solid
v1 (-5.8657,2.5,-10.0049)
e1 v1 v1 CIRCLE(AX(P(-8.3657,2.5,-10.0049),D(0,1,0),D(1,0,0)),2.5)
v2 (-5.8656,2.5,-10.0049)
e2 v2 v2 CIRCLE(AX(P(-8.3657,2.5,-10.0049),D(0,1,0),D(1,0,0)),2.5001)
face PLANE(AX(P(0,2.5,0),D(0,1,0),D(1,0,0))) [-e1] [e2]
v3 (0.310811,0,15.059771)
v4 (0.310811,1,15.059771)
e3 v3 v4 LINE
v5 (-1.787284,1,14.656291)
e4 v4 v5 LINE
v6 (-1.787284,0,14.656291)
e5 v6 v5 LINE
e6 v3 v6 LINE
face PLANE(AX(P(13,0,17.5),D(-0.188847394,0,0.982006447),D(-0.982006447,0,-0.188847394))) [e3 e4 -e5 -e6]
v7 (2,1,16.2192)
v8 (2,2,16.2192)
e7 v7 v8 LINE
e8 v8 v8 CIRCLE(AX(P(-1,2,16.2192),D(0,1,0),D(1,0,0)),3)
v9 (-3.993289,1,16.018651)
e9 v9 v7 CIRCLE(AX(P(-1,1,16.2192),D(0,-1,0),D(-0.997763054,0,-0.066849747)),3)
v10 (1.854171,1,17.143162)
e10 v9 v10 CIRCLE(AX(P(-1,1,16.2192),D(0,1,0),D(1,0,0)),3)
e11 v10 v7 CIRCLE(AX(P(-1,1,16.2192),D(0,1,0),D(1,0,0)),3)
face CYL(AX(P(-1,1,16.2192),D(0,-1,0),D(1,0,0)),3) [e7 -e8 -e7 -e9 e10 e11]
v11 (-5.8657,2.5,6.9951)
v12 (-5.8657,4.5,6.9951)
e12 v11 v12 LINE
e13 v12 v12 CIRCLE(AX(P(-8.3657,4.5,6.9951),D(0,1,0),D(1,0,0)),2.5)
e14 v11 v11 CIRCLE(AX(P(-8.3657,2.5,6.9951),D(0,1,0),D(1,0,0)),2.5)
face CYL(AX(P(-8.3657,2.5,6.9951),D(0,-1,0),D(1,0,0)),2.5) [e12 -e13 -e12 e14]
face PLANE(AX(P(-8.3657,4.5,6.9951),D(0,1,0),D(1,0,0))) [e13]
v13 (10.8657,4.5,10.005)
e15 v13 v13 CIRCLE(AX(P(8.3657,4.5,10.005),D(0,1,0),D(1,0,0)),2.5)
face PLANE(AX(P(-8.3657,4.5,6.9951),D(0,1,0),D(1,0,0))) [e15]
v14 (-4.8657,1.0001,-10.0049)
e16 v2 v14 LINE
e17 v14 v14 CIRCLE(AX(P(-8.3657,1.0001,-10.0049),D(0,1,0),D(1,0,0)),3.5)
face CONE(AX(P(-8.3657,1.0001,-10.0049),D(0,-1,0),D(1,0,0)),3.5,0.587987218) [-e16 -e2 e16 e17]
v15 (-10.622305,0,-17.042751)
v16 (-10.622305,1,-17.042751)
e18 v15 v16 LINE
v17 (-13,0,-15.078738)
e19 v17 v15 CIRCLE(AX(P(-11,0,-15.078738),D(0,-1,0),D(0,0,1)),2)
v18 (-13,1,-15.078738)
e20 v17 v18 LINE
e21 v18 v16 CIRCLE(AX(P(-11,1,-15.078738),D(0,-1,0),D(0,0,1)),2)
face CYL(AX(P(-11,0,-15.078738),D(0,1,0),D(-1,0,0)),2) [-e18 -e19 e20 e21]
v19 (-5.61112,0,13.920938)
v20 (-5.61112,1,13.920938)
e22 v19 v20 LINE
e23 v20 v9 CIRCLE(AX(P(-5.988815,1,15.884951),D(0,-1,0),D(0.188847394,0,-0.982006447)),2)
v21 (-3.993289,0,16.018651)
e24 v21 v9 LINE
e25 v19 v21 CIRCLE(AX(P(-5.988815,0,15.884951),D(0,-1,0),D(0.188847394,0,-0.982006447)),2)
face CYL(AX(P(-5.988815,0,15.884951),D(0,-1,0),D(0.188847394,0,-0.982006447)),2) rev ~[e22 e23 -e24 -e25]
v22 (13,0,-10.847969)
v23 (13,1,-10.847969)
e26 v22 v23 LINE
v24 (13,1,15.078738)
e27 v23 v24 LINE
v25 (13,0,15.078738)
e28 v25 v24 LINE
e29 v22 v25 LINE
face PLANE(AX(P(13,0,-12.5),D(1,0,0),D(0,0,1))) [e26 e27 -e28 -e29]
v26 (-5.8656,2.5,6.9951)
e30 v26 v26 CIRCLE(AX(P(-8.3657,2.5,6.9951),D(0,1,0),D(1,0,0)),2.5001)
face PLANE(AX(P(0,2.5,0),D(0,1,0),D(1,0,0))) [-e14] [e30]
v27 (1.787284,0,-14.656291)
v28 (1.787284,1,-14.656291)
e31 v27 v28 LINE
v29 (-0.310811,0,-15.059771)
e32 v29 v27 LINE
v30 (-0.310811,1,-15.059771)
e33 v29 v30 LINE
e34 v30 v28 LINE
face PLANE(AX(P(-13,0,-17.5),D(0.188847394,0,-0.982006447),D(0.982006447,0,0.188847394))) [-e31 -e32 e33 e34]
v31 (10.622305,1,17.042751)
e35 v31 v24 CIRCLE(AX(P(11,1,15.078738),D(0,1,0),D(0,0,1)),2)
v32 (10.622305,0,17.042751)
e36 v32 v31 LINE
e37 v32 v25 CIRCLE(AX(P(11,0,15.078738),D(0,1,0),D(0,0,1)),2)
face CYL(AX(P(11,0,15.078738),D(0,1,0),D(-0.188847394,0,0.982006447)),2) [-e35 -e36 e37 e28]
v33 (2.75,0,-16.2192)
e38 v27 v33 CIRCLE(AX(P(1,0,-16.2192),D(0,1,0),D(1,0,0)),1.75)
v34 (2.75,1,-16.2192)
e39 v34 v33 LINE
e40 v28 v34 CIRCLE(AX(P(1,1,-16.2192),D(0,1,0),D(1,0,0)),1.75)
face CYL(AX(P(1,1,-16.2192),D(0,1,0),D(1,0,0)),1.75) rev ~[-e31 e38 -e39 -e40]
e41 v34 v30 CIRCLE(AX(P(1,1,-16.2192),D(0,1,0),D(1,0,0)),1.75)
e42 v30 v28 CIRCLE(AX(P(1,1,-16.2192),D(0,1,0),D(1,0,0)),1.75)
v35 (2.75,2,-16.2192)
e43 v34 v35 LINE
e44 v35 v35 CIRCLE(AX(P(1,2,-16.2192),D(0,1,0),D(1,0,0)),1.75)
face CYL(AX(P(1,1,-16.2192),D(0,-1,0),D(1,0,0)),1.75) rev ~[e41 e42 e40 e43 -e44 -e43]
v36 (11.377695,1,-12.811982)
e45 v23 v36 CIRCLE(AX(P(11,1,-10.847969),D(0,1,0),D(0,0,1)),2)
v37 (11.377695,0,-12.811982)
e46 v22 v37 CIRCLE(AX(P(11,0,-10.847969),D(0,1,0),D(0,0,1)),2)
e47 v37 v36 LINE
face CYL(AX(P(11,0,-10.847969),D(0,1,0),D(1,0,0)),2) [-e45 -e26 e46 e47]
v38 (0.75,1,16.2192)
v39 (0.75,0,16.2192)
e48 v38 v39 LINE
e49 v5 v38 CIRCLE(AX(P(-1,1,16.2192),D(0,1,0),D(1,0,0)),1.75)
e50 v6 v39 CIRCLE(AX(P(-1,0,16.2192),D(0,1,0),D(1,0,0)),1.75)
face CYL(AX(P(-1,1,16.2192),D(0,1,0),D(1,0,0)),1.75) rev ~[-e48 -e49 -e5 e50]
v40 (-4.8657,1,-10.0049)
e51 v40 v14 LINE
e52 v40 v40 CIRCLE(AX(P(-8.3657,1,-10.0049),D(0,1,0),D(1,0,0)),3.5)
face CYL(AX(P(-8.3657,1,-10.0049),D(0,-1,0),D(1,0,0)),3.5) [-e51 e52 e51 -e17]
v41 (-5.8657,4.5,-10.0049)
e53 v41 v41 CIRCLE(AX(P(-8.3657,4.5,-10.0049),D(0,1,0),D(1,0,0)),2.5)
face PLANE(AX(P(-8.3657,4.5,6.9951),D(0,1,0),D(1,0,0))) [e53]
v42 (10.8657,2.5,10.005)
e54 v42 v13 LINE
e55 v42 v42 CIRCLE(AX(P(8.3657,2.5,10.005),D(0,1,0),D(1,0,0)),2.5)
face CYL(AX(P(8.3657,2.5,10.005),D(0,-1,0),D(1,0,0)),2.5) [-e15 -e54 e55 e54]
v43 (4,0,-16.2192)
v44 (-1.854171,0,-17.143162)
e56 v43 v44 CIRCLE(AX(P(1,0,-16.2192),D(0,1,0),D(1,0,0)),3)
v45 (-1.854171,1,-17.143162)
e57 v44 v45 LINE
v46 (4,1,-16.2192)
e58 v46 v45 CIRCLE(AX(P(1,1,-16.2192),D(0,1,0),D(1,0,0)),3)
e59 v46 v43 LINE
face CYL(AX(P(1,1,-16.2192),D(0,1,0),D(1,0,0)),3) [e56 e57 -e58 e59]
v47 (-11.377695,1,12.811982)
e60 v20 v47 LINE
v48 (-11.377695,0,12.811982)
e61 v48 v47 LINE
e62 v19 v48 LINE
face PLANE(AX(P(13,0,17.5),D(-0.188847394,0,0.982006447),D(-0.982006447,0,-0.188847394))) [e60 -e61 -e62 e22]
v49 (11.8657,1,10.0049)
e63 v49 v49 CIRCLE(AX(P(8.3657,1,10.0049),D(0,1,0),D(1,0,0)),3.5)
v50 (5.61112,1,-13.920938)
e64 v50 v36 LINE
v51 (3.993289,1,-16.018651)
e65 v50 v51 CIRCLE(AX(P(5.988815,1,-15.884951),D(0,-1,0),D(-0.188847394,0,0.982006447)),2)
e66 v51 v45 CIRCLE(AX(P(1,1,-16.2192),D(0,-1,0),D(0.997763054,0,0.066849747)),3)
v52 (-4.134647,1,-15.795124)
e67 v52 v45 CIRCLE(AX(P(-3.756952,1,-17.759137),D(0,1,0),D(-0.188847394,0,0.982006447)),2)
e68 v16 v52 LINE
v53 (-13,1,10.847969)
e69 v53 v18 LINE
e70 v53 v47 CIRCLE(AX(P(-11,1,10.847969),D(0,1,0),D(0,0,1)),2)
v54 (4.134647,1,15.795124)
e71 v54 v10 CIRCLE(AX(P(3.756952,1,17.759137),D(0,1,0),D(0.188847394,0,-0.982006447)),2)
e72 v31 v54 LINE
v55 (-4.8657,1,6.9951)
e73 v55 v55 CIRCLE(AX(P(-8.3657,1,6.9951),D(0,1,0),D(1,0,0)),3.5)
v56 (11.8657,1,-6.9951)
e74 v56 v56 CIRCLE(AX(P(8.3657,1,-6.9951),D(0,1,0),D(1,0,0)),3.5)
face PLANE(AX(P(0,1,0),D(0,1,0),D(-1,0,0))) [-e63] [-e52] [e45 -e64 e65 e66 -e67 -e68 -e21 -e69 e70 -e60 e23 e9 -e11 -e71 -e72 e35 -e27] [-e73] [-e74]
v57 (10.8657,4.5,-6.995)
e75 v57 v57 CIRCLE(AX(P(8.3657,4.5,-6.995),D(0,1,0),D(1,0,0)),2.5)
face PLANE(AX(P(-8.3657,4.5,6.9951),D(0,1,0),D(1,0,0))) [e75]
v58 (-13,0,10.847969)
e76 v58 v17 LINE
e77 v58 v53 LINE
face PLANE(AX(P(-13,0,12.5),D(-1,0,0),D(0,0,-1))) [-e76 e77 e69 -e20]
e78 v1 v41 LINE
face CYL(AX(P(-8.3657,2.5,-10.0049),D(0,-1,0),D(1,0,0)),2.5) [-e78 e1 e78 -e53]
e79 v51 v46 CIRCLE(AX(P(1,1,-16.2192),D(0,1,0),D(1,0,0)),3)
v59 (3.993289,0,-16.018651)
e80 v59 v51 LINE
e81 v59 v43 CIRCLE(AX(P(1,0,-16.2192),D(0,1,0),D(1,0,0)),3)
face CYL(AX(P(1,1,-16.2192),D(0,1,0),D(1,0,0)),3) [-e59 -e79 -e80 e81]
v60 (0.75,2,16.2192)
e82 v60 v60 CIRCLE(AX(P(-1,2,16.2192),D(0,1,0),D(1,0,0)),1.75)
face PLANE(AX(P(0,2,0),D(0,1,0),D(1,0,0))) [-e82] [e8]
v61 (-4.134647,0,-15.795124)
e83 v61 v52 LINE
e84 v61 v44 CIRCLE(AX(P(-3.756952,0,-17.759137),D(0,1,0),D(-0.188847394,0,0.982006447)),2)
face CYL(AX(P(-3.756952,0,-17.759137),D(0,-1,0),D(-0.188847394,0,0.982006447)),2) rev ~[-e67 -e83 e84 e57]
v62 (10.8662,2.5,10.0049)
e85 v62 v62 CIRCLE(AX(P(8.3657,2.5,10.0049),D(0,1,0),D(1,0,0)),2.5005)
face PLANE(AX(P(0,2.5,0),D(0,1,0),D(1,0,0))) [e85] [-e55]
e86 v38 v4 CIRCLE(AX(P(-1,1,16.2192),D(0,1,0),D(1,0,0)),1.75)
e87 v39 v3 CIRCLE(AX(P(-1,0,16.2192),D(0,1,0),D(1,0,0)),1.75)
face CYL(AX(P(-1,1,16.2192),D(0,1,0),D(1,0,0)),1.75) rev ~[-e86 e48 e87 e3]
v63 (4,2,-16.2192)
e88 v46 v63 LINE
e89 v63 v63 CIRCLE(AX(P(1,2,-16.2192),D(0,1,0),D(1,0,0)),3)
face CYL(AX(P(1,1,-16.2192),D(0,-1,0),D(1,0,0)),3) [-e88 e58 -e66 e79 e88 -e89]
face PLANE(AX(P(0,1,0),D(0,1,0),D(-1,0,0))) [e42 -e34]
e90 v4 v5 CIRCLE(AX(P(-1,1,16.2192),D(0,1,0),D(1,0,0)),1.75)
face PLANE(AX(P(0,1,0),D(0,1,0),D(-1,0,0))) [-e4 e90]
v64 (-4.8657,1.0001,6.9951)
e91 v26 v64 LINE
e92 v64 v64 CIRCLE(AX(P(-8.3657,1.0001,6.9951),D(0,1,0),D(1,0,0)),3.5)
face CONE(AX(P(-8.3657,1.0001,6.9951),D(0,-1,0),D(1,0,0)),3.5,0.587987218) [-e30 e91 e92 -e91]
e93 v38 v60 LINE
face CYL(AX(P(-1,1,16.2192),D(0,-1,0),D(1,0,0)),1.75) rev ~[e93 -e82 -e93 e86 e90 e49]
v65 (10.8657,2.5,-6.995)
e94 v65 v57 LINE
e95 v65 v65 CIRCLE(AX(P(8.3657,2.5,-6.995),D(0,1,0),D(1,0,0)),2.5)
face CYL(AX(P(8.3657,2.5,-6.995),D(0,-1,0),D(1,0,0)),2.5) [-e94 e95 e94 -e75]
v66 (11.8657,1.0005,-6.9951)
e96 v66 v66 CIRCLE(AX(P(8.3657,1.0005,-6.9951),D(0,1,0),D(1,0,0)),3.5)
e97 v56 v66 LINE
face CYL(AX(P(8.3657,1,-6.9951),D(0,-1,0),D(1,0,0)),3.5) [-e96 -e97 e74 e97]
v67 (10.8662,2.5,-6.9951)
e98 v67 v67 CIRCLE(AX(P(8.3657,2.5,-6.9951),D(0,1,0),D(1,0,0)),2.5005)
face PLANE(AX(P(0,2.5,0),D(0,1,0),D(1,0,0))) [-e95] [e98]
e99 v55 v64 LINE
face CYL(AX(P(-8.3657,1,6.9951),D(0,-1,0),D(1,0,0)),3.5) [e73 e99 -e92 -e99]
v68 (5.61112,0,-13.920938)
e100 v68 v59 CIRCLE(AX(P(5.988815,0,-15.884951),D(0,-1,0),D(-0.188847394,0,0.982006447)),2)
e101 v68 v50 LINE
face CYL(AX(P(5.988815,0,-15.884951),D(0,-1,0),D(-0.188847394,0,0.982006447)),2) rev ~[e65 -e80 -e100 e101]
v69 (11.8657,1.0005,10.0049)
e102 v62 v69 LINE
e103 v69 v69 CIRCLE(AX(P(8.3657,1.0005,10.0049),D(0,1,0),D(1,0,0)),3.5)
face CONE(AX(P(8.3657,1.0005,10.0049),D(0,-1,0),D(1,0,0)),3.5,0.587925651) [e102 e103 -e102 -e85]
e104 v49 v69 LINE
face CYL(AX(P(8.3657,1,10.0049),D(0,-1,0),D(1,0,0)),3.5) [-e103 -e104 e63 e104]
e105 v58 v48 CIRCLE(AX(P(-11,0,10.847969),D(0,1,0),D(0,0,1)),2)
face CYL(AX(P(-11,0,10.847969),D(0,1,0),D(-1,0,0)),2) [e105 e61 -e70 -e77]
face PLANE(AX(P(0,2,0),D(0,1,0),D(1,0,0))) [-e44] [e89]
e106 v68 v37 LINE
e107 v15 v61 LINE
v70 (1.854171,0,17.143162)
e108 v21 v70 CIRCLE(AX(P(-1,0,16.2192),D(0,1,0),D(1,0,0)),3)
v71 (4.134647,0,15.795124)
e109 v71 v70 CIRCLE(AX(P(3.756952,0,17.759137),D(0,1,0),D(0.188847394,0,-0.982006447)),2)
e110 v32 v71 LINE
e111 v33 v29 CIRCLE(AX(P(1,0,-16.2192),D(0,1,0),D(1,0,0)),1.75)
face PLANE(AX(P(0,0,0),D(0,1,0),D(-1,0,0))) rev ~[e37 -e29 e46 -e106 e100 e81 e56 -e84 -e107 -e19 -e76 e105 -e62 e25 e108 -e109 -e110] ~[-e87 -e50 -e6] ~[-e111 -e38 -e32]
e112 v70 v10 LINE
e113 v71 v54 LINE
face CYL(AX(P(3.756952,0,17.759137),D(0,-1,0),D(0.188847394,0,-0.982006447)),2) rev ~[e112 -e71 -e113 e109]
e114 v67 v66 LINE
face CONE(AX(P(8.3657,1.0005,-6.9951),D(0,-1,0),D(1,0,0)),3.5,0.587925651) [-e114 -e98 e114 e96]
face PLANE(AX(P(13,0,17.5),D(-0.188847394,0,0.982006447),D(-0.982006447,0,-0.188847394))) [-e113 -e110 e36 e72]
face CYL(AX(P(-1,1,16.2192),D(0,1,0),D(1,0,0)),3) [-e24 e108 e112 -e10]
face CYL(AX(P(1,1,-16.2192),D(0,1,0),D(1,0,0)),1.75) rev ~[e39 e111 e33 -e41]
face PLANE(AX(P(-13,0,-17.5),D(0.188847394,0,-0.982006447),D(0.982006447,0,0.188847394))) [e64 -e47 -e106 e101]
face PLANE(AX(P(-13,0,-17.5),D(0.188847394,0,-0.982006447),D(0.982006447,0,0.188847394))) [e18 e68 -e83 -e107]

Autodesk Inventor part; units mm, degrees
ref_plane "YZ Plane" through (0, 0, 0) normal (1, 0, 0) x (0, 1, 0)
ref_plane "XZ Plane" through (0, 0, 0) normal (0, 1, 0) x (-1, 0, 0)
ref_plane "XY Plane" through (0, 0, 0) normal (0, 0, 1) x (1, 0, 0)
sketch "Esquisse2" plane through (0, 0, 0) normal (0, 1, 0) x (-1, 0, 0)
  line L0 (13, 12.5) -> (13, -17.5)
  line L1 (13, -17.5) -> (-13, -12.5)
  line L2 (-13, -12.5) -> (-13, 17.5)
  line L3 (-13, 17.5) -> (13, 12.5)
  point P0 (0, 0)
  dimension "d0" = 30
  dimension "d1" = 26
  dimension "d2" = 13
  dimension "d4" = 5
  dimension "d5" = 30
  dimension "d11" = 12.5
extrude "Extrusion1" add sketch "Esquisse2" along normal blind 1
sketch "Esquisse3" plane through (0, 1, 0) normal (0, 1, 0) x (1, 0, 0)
  circle A0 centre (-1, -16.2192) radius 1.75
  circle A1 centre (1, 16.2192) radius 1.75
  line L0 (-1, -16.2192) -> (0, 0) construction
  line L1 (0, 0) -> (1, 16.2192) construction
  line L2 (13, -17.5) -> (13, 12.5) construction
  circle A2 centre (-1, -16.2192) radius 3
  circle A3 centre (1, 16.2192) radius 3
  dimension "d8" = 3.5
  dimension "d9" = 3.5
  dimension "d10" = 36
  dimension "d13" = 12
  dimension "d14" = 6
  dimension "d15" = 6
extrude "Extrusion2" add sketch "Esquisse3" along normal blind 1 and the other way blind 1
fillet "Congé1" radius 2 4 edges at (-3.3509, 0.5, 14.3556) (1.8745, 0.5, 15.3605) (-1.8745, 0.5, -15.3605) (3.3509, 0.5, -14.3556)
fillet "Congé2" radius 2 4 edges at (13, 0.5, -12.5) (13, 0.5, 17.5) (-13, 0.5, 12.5) (-13, 0.5, -17.5)
sketch "Esquisse4" plane through (0, 1, 0) normal (0, 1, 0) x (1, 0, 0)
  circle A0 centre (-8.3657, -6.9951) radius 3.5
  circle A1 centre (-8.3657, 10.0049) radius 3.5
  circle A2 centre (8.3657, 6.9951) radius 3.5
  circle A3 centre (8.3657, -10.0049) radius 3.5
  line L0 (0, -25) -> (0, 25) construction
  line L1 (-13.9609, 0) -> (15.5775, 0) construction
  line L2 (-13, 15.0787) -> (-13, -10.848) construction
  circle A4 centre (-1, -16.2192) radius 1.75 construction
  line L3 (-8.3657, -6.9951) -> (0, -6.9951) construction
  line L4 (8.3657, -10.0049) -> (0, -10.0049) construction
  line L5 (-8.3657, 10.0049) -> (0, 10.0049) construction
  line L6 (8.3657, 6.9951) -> (0, 6.9951) construction
  line L7 (-7.4081, -6.9951) -> (-7.4081, 0) construction
  line L8 (8.3657, 6.9951) -> (8.3657, 0) construction
  point P0 (0, 0)
  dimension "d22" = 7
  dimension "d23" = 7
  dimension "d24" = 7
  dimension "d25" = 7
  dimension "d26" = 17
  dimension "d27" = 17
  dimension "d28" = 24
  dimension "d29" = 24
  dimension "d30" = 13
  dimension "d32" = 50
  dimension "d33" = 25
  dimension "d34" = 25
extrude "Extrusion3" add sketch "Esquisse4" along normal blind 1.5
sketch "Esquisse5" plane through (-8.3657, 2.5, 6.9951) normal (0, 1, 0) x (1, 0, 0)
  circle A0 centre (0, 0) radius 2.5
  circle A1 centre (0, 17) radius 2.5
  circle A2 centre (16.7314, -3.0099) radius 2.5
  circle A3 centre (16.7314, 13.9901) radius 2.5
  circle A4 centre (16.7314, 13.9901) radius 3.5 projected
  circle A5 centre (0, 17) radius 3.5 projected
  circle A6 centre (16.7314, -3.0099) radius 3.5 projected
  circle A7 centre (0, 0) radius 3.5 projected
  point P0 (8.3657, 6.9951)
  dimension "d37" = 5
  dimension "d38" = 5
  dimension "d39" = 5
  dimension "d40" = 5
extrude "Extrusion4" add sketch "Esquisse5" along normal blind 2 contours A0 | A1 | A2 | A3
chamfer "Chanfrein1" distance 1 distance2 1.5 1 edges at (-11.8657, 2.5, 6.9951) measured on face at (-5.2329, 2.5, 7.2743)
chamfer "Chanfrein2" distance 1 distance2 1.5 1 edges at (-11.8657, 2.5, -10.0049) measured on face at (-5.2329, 2.5, -9.7257)
chamfer "Chanfrein3" distance 1 distance2 1.5 1 edges at (4.8657, 2.5, 10.0049) measured on face at (11.4743, 2.5, 10.4836)
chamfer "Chanfrein4" distance 1 distance2 1.5 1 edges at (4.8657, 2.5, -6.9951) measured on face at (11.4985, 2.5, -6.7159)
equation "\"d2\" = 0.5 * d1"
equation "\"d5\" = d0"
equation "\"d11\" = 0.5 * d0 - 0.5 * d4"
equation "\"d9\" = d8"
equation "\"d15\" = d14"
equation "\"d23\" = d22"
equation "\"d24\" = d22"
equation "\"d25\" = d22"
equation "\"d27\" = d26"
equation "\"d28\" = d26 + d22"
equation "\"d29\" = d28"
equation "\"d33\" = 0.5 * d32"
equation "\"d34\" = d33"
equation "\"d38\" = d37"
equation "\"d39\" = d37"
equation "\"d40\" = d37"
properties part number "Membrane - Boutons" material "Caoutchouc"
